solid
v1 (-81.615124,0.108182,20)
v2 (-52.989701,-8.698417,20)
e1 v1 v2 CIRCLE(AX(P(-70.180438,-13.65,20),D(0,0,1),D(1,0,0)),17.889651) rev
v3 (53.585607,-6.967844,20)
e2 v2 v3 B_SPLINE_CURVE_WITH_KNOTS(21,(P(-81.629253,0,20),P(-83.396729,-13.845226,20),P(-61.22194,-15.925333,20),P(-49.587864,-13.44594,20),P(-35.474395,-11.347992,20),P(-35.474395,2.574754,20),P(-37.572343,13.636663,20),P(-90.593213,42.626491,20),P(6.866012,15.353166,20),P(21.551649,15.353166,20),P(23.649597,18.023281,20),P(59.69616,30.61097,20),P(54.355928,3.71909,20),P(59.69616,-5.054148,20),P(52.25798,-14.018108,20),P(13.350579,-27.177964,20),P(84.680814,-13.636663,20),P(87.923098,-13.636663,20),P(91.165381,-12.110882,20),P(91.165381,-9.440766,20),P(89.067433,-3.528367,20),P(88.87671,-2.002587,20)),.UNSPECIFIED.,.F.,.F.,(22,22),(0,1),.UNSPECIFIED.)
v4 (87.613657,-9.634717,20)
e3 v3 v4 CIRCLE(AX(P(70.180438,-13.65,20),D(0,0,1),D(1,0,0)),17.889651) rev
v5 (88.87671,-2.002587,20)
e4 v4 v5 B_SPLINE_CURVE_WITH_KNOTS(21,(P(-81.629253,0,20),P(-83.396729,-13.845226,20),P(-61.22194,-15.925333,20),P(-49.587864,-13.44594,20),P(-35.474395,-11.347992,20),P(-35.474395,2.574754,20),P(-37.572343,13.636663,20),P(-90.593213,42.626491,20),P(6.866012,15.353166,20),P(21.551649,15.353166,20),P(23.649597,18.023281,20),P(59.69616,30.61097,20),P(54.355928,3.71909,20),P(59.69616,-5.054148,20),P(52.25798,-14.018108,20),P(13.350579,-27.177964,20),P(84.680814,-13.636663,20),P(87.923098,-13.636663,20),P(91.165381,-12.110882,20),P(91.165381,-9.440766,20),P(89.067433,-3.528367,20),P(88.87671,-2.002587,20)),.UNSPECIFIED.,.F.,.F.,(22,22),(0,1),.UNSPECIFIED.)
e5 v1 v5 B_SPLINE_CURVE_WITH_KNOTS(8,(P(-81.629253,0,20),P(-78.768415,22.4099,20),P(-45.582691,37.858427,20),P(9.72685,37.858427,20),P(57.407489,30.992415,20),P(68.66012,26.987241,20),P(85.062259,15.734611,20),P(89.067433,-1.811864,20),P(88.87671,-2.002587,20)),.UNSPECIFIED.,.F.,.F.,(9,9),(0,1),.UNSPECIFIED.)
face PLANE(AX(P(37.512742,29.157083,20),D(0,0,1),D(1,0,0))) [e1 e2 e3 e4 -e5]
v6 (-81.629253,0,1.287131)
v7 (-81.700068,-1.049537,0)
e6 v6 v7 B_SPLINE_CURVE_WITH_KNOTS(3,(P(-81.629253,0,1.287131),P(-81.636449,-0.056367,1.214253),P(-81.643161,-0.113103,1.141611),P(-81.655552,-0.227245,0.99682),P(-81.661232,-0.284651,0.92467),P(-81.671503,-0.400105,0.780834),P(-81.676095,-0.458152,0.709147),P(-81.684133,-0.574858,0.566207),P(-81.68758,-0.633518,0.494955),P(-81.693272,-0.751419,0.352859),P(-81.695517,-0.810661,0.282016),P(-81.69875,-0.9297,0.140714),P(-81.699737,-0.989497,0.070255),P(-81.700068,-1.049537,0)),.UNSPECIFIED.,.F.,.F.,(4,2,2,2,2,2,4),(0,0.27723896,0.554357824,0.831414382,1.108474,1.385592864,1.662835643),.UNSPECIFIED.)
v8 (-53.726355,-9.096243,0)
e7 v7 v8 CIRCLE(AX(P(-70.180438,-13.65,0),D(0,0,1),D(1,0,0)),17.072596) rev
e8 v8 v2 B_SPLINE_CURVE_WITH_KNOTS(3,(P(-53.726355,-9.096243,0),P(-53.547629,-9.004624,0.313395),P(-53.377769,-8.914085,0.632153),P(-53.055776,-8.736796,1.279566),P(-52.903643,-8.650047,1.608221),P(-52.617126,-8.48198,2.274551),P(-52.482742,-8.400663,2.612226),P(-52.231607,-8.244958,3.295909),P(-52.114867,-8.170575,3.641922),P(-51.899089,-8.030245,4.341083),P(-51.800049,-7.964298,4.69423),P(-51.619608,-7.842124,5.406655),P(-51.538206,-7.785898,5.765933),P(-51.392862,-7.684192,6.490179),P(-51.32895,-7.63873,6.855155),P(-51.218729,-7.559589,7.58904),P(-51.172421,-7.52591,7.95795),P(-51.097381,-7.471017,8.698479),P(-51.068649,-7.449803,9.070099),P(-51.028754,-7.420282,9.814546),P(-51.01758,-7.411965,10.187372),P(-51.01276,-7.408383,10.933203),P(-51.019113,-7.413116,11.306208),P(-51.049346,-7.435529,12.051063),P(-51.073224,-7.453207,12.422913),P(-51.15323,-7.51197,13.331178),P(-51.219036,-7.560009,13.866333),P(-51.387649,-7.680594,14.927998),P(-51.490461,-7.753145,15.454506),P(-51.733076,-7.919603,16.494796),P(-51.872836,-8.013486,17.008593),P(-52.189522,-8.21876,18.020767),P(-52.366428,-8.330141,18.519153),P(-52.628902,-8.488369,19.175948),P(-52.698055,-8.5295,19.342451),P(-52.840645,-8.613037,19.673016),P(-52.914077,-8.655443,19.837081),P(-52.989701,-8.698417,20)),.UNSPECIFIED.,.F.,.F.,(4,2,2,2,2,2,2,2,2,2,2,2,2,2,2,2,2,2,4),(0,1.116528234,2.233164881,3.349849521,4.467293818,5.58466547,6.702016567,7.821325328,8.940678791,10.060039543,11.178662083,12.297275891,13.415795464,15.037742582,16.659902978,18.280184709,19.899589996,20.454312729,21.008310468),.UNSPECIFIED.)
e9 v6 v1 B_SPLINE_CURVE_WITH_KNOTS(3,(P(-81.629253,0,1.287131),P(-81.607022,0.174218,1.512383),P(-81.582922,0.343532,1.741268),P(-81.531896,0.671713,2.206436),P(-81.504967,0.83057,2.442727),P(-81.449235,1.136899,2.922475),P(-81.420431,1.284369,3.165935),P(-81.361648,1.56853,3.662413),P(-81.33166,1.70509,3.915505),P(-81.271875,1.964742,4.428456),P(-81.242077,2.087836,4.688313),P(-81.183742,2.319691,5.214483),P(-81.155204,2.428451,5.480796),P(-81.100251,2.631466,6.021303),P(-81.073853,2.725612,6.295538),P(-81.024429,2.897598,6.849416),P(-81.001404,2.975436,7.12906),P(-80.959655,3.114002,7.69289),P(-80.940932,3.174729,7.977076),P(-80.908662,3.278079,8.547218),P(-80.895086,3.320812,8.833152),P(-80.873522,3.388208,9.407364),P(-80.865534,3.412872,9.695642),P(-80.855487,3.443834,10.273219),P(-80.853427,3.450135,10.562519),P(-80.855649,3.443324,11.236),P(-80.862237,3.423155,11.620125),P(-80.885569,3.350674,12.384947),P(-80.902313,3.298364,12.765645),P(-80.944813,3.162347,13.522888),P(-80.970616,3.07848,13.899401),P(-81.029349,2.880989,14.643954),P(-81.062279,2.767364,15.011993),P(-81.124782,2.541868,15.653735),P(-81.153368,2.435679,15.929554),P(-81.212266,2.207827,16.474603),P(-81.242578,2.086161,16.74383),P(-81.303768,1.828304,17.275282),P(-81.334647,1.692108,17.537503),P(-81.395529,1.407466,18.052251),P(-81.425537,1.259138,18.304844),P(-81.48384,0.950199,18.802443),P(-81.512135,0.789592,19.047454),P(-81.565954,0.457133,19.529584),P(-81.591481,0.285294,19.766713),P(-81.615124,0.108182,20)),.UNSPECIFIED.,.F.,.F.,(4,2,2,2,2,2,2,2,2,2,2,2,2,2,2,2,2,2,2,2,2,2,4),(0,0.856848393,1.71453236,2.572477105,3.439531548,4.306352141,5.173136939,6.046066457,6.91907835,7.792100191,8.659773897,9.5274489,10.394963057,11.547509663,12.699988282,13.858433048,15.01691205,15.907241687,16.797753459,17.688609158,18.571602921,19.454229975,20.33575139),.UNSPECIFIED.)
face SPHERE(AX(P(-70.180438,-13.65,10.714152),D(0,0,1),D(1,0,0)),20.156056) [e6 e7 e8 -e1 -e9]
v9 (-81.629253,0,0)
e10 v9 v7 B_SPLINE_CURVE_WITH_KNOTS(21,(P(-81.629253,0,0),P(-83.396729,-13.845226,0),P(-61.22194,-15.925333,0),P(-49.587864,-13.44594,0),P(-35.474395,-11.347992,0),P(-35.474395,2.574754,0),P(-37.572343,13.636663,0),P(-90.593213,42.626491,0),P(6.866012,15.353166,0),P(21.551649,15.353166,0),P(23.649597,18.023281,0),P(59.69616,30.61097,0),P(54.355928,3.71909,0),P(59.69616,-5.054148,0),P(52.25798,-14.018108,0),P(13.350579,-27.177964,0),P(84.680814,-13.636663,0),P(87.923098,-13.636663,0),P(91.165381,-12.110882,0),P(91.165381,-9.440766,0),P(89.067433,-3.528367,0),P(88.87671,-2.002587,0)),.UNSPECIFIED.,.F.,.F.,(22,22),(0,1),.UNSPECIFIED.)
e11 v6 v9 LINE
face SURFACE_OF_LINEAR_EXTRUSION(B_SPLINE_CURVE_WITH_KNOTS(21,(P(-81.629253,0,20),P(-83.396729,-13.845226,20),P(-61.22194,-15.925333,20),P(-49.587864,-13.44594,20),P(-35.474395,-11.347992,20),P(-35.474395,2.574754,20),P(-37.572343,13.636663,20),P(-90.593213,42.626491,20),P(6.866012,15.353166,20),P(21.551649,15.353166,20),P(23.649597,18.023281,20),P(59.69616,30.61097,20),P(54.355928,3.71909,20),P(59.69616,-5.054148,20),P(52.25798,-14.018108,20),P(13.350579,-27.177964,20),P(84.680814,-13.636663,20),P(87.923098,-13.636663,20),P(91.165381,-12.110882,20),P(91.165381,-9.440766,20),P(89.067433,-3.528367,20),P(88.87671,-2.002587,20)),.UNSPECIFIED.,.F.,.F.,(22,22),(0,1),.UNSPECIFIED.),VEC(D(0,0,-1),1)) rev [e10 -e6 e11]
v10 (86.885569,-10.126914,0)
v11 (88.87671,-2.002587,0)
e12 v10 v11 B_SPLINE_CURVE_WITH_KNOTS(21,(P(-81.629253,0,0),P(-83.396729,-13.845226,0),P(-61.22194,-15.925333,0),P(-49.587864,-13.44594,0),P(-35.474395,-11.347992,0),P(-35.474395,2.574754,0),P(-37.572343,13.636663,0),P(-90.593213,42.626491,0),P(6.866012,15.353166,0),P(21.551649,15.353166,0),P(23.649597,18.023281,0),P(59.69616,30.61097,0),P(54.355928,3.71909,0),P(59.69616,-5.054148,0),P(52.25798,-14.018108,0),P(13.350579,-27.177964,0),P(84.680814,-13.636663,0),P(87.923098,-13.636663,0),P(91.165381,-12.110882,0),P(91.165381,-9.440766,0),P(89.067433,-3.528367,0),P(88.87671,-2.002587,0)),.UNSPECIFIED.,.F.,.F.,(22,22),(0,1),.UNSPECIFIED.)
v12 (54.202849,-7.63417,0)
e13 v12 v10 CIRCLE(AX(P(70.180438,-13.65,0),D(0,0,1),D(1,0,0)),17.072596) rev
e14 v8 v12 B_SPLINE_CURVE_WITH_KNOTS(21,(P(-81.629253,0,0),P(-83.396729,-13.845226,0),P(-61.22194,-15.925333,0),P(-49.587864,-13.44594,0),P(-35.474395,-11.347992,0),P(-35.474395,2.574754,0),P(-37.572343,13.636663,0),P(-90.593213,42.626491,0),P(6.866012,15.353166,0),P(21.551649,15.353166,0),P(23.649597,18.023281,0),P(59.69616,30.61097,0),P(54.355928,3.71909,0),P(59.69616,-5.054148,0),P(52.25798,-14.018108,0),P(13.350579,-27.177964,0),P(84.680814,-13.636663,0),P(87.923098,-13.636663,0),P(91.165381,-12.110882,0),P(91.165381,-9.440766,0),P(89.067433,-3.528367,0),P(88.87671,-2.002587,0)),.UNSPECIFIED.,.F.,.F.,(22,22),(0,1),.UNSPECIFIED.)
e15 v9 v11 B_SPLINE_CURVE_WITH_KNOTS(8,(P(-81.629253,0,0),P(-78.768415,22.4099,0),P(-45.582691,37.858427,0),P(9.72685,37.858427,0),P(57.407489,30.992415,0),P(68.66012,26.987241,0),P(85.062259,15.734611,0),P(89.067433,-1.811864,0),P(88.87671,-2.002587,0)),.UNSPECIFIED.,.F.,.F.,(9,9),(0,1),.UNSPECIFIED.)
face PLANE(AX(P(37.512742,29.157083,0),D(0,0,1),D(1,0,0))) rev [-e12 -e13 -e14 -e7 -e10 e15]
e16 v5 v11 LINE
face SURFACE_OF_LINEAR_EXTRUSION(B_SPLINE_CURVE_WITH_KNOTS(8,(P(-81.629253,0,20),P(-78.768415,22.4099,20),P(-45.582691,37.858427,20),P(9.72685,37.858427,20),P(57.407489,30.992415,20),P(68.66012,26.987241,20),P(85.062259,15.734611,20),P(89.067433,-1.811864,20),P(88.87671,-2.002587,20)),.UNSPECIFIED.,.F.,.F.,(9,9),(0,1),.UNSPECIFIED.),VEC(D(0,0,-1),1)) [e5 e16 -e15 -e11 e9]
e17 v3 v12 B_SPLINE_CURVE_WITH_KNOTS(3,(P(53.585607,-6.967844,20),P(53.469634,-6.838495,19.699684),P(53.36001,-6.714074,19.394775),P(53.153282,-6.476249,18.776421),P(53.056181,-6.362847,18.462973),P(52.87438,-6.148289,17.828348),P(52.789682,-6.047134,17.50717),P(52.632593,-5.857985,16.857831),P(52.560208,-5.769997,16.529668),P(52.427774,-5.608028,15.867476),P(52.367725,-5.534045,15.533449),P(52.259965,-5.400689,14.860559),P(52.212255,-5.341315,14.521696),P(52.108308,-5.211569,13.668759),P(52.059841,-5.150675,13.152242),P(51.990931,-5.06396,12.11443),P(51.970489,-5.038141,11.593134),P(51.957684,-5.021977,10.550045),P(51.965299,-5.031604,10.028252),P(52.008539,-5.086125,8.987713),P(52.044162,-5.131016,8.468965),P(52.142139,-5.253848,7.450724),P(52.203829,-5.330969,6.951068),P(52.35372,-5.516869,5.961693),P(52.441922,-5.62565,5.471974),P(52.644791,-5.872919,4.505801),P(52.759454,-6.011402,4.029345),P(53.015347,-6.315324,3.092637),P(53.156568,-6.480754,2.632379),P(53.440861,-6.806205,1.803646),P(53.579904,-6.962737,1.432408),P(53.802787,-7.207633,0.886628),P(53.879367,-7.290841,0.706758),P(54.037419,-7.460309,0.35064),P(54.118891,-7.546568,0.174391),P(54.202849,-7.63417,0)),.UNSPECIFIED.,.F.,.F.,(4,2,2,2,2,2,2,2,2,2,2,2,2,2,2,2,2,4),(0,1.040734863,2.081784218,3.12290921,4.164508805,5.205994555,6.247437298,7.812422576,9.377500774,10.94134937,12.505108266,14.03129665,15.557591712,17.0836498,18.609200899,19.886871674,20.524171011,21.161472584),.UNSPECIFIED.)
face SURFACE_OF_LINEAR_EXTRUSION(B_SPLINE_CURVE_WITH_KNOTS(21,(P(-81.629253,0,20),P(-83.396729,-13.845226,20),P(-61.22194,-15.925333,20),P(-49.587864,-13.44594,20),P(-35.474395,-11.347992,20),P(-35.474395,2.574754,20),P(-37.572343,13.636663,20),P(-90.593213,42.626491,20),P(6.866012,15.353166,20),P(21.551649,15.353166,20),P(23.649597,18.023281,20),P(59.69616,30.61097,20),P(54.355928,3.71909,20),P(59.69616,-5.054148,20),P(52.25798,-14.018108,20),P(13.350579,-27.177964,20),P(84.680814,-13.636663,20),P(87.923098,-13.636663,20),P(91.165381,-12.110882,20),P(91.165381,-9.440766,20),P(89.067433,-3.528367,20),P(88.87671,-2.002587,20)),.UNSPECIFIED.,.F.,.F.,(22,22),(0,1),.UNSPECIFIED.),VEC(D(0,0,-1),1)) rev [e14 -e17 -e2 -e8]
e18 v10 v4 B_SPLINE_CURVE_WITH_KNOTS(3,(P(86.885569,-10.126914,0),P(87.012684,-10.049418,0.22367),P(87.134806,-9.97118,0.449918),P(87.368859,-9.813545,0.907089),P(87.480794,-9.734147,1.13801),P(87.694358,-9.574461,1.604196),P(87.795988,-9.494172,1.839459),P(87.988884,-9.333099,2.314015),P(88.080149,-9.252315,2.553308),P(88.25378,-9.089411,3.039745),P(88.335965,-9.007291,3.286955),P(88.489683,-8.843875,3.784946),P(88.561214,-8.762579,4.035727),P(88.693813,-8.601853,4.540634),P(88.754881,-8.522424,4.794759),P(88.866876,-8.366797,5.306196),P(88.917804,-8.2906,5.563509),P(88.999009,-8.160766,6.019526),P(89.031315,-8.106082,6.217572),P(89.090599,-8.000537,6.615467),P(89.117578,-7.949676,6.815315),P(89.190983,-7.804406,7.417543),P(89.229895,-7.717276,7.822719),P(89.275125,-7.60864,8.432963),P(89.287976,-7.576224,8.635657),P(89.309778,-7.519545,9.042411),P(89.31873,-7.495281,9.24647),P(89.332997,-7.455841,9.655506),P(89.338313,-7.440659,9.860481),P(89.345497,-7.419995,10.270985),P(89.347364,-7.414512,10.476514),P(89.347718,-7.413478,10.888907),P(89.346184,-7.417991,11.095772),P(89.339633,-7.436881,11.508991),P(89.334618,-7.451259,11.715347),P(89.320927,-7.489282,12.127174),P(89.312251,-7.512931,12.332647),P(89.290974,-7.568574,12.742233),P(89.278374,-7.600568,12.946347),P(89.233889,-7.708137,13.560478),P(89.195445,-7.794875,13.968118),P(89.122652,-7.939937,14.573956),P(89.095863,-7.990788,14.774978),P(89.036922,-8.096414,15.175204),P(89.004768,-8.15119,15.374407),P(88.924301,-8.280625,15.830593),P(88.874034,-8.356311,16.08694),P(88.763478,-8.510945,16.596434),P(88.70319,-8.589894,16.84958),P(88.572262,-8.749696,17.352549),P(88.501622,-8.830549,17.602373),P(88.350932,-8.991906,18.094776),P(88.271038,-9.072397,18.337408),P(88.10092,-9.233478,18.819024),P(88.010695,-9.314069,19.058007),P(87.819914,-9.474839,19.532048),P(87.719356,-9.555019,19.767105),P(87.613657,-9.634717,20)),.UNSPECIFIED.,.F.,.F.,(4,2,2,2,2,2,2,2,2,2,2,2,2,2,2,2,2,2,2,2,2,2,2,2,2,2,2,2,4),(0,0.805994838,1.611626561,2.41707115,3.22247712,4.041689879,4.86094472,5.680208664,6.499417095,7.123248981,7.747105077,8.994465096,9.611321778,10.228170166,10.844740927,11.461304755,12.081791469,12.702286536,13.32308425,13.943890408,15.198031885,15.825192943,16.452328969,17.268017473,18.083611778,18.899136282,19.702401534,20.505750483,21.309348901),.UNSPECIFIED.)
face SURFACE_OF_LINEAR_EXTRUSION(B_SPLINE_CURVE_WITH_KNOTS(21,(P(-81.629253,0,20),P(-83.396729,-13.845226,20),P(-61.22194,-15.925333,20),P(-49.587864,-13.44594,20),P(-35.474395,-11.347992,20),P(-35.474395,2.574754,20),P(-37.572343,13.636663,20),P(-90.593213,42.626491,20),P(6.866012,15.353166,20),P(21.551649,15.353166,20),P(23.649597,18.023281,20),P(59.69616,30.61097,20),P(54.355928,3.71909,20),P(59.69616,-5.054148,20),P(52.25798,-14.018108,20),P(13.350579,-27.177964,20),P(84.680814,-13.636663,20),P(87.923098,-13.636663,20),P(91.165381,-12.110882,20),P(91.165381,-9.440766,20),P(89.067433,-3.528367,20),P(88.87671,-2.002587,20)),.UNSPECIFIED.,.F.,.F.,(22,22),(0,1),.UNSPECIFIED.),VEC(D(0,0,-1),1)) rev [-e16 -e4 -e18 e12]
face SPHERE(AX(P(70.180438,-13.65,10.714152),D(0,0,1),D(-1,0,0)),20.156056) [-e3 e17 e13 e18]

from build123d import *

# Parameters (mm, degrees)
BOSS_EXTRUDE1_DEPTH = 20


# Read off the part's stored shape, not the designer's step: Boss-Extrude1
with BuildPart() as part:
    # Boss-Extrude1 outline → Boss-Extrude1 (new body)
    with BuildSketch(Plane.XY):
        with BuildLine():
            add(Edge.make_bspline(
                [(88.876710402, -2.002586822), (88.9493666131852, -1.9299306111192516), (88.4625699978628, 0.4568259281849222), (87.07101235202, 4.161910300422061), (84.73052634724378, 8.45500011557144), (81.46452093002502, 12.839206368183609), (77.24103186625386, 17.00911709970944), (71.93195290896183, 20.803795803023178), (65.32925222978359, 24.158999559971143), (57.19621791696868, 27.06225253428082), (47.335015505133114, 29.51378107366912), (35.65507966429881, 31.49568730649157), (22.23010133812801, 32.95110874977801), (7.334610783619065, 33.77448207700359), (-8.545603873112306, 33.81339982544799), (-24.73176378798255, 32.88191945449804), (-40.39833431767832, 30.78455479775411), (-54.643270604282016, 27.349550583302506), (-66.57507756172521, 22.469411328020367), (-75.406248837651, 16.14602654328372), (-80.53941016190787, 8.537104820951011), (-83.39672891288393, -13.84522539502793), (-61.221940715805076, -15.925333234293028), (-49.587864737730854, -13.445940213401869), (-35.47439605280903, -11.347992129221693), (-35.474395138973044, 2.574753359034609), (-37.57234303482898, 13.63666157313359), (-90.59320738468432, 42.62648764825083), (6.865999341566411, 15.353169169956265), (21.55164652021018, 15.353165638104155), (23.649596419713923, 18.023280969032704), (59.69615314335737, 30.61096775758453), (54.355929072849776, 3.719095036640508), (59.696158438048975, -5.054145848334971), (52.257981621563104, -14.0181057250969), (13.350588262830351, -27.17796082242287), (84.68079572840632, -13.636666154662072), (87.92309673716264, -13.636662647508883), (91.16538011136153, -12.110882655992413), (91.16538105607023, -9.440767269492538), (89.0674336356561, -3.528369172562094), (88.876710402, -2.002586822)],
                knots=[0, 0, 0, 0, 0, 0, 0, 0, 0, 0, 0, 0, 0, 0, 0, 0, 0, 0, 0, 0, 0, 0, 1, 1, 1, 1, 1, 1, 1, 1, 1, 1, 1, 1, 1, 1, 1, 1, 1, 1, 1, 1, 2.62177057508421, 2.62177057508421, 2.62177057508421, 2.62177057508421, 2.62177057508421, 2.62177057508421, 2.62177057508421, 2.62177057508421, 2.62177057508421, 2.62177057508421, 2.62177057508421, 2.62177057508421, 2.62177057508421, 2.62177057508421, 2.62177057508421, 2.62177057508421, 2.62177057508421, 2.62177057508421, 2.62177057508421, 2.62177057508421, 2.62177057508421, 2.62177057508421], degree=21))
        make_face()
    extrude(amount=BOSS_EXTRUDE1_DEPTH)

    # Sketch7 → Revolve4 (revolve)
    with BuildSketch(Plane(origin=(2.6990032539533013, -13.65, 1.73e-15), x_dir=(1, 0, 0), z_dir=(0, 1, 0))):
        with BuildLine():
            Line((67.48143473107149, -30.87020769655964), (67.48143473107149, 9.44190425666576))
            ThreePointArc((67.48143473107149, 9.44190425666576), (47.32537875445879, -10.714151719946939), (67.48143473107149, -30.87020769655964))
        make_face()
    revolve4 = revolve(axis=Axis((70.1804379850248, -13.65, 30.87020769655964), (0, 0, -1)))

    # Mirror1: Revolve4 across plane
    add(revolve4.mirror(Plane(origin=(0, 0, 0), x_dir=(0, 0, 1), z_dir=(1, 0, 0))))


solid = part.part
